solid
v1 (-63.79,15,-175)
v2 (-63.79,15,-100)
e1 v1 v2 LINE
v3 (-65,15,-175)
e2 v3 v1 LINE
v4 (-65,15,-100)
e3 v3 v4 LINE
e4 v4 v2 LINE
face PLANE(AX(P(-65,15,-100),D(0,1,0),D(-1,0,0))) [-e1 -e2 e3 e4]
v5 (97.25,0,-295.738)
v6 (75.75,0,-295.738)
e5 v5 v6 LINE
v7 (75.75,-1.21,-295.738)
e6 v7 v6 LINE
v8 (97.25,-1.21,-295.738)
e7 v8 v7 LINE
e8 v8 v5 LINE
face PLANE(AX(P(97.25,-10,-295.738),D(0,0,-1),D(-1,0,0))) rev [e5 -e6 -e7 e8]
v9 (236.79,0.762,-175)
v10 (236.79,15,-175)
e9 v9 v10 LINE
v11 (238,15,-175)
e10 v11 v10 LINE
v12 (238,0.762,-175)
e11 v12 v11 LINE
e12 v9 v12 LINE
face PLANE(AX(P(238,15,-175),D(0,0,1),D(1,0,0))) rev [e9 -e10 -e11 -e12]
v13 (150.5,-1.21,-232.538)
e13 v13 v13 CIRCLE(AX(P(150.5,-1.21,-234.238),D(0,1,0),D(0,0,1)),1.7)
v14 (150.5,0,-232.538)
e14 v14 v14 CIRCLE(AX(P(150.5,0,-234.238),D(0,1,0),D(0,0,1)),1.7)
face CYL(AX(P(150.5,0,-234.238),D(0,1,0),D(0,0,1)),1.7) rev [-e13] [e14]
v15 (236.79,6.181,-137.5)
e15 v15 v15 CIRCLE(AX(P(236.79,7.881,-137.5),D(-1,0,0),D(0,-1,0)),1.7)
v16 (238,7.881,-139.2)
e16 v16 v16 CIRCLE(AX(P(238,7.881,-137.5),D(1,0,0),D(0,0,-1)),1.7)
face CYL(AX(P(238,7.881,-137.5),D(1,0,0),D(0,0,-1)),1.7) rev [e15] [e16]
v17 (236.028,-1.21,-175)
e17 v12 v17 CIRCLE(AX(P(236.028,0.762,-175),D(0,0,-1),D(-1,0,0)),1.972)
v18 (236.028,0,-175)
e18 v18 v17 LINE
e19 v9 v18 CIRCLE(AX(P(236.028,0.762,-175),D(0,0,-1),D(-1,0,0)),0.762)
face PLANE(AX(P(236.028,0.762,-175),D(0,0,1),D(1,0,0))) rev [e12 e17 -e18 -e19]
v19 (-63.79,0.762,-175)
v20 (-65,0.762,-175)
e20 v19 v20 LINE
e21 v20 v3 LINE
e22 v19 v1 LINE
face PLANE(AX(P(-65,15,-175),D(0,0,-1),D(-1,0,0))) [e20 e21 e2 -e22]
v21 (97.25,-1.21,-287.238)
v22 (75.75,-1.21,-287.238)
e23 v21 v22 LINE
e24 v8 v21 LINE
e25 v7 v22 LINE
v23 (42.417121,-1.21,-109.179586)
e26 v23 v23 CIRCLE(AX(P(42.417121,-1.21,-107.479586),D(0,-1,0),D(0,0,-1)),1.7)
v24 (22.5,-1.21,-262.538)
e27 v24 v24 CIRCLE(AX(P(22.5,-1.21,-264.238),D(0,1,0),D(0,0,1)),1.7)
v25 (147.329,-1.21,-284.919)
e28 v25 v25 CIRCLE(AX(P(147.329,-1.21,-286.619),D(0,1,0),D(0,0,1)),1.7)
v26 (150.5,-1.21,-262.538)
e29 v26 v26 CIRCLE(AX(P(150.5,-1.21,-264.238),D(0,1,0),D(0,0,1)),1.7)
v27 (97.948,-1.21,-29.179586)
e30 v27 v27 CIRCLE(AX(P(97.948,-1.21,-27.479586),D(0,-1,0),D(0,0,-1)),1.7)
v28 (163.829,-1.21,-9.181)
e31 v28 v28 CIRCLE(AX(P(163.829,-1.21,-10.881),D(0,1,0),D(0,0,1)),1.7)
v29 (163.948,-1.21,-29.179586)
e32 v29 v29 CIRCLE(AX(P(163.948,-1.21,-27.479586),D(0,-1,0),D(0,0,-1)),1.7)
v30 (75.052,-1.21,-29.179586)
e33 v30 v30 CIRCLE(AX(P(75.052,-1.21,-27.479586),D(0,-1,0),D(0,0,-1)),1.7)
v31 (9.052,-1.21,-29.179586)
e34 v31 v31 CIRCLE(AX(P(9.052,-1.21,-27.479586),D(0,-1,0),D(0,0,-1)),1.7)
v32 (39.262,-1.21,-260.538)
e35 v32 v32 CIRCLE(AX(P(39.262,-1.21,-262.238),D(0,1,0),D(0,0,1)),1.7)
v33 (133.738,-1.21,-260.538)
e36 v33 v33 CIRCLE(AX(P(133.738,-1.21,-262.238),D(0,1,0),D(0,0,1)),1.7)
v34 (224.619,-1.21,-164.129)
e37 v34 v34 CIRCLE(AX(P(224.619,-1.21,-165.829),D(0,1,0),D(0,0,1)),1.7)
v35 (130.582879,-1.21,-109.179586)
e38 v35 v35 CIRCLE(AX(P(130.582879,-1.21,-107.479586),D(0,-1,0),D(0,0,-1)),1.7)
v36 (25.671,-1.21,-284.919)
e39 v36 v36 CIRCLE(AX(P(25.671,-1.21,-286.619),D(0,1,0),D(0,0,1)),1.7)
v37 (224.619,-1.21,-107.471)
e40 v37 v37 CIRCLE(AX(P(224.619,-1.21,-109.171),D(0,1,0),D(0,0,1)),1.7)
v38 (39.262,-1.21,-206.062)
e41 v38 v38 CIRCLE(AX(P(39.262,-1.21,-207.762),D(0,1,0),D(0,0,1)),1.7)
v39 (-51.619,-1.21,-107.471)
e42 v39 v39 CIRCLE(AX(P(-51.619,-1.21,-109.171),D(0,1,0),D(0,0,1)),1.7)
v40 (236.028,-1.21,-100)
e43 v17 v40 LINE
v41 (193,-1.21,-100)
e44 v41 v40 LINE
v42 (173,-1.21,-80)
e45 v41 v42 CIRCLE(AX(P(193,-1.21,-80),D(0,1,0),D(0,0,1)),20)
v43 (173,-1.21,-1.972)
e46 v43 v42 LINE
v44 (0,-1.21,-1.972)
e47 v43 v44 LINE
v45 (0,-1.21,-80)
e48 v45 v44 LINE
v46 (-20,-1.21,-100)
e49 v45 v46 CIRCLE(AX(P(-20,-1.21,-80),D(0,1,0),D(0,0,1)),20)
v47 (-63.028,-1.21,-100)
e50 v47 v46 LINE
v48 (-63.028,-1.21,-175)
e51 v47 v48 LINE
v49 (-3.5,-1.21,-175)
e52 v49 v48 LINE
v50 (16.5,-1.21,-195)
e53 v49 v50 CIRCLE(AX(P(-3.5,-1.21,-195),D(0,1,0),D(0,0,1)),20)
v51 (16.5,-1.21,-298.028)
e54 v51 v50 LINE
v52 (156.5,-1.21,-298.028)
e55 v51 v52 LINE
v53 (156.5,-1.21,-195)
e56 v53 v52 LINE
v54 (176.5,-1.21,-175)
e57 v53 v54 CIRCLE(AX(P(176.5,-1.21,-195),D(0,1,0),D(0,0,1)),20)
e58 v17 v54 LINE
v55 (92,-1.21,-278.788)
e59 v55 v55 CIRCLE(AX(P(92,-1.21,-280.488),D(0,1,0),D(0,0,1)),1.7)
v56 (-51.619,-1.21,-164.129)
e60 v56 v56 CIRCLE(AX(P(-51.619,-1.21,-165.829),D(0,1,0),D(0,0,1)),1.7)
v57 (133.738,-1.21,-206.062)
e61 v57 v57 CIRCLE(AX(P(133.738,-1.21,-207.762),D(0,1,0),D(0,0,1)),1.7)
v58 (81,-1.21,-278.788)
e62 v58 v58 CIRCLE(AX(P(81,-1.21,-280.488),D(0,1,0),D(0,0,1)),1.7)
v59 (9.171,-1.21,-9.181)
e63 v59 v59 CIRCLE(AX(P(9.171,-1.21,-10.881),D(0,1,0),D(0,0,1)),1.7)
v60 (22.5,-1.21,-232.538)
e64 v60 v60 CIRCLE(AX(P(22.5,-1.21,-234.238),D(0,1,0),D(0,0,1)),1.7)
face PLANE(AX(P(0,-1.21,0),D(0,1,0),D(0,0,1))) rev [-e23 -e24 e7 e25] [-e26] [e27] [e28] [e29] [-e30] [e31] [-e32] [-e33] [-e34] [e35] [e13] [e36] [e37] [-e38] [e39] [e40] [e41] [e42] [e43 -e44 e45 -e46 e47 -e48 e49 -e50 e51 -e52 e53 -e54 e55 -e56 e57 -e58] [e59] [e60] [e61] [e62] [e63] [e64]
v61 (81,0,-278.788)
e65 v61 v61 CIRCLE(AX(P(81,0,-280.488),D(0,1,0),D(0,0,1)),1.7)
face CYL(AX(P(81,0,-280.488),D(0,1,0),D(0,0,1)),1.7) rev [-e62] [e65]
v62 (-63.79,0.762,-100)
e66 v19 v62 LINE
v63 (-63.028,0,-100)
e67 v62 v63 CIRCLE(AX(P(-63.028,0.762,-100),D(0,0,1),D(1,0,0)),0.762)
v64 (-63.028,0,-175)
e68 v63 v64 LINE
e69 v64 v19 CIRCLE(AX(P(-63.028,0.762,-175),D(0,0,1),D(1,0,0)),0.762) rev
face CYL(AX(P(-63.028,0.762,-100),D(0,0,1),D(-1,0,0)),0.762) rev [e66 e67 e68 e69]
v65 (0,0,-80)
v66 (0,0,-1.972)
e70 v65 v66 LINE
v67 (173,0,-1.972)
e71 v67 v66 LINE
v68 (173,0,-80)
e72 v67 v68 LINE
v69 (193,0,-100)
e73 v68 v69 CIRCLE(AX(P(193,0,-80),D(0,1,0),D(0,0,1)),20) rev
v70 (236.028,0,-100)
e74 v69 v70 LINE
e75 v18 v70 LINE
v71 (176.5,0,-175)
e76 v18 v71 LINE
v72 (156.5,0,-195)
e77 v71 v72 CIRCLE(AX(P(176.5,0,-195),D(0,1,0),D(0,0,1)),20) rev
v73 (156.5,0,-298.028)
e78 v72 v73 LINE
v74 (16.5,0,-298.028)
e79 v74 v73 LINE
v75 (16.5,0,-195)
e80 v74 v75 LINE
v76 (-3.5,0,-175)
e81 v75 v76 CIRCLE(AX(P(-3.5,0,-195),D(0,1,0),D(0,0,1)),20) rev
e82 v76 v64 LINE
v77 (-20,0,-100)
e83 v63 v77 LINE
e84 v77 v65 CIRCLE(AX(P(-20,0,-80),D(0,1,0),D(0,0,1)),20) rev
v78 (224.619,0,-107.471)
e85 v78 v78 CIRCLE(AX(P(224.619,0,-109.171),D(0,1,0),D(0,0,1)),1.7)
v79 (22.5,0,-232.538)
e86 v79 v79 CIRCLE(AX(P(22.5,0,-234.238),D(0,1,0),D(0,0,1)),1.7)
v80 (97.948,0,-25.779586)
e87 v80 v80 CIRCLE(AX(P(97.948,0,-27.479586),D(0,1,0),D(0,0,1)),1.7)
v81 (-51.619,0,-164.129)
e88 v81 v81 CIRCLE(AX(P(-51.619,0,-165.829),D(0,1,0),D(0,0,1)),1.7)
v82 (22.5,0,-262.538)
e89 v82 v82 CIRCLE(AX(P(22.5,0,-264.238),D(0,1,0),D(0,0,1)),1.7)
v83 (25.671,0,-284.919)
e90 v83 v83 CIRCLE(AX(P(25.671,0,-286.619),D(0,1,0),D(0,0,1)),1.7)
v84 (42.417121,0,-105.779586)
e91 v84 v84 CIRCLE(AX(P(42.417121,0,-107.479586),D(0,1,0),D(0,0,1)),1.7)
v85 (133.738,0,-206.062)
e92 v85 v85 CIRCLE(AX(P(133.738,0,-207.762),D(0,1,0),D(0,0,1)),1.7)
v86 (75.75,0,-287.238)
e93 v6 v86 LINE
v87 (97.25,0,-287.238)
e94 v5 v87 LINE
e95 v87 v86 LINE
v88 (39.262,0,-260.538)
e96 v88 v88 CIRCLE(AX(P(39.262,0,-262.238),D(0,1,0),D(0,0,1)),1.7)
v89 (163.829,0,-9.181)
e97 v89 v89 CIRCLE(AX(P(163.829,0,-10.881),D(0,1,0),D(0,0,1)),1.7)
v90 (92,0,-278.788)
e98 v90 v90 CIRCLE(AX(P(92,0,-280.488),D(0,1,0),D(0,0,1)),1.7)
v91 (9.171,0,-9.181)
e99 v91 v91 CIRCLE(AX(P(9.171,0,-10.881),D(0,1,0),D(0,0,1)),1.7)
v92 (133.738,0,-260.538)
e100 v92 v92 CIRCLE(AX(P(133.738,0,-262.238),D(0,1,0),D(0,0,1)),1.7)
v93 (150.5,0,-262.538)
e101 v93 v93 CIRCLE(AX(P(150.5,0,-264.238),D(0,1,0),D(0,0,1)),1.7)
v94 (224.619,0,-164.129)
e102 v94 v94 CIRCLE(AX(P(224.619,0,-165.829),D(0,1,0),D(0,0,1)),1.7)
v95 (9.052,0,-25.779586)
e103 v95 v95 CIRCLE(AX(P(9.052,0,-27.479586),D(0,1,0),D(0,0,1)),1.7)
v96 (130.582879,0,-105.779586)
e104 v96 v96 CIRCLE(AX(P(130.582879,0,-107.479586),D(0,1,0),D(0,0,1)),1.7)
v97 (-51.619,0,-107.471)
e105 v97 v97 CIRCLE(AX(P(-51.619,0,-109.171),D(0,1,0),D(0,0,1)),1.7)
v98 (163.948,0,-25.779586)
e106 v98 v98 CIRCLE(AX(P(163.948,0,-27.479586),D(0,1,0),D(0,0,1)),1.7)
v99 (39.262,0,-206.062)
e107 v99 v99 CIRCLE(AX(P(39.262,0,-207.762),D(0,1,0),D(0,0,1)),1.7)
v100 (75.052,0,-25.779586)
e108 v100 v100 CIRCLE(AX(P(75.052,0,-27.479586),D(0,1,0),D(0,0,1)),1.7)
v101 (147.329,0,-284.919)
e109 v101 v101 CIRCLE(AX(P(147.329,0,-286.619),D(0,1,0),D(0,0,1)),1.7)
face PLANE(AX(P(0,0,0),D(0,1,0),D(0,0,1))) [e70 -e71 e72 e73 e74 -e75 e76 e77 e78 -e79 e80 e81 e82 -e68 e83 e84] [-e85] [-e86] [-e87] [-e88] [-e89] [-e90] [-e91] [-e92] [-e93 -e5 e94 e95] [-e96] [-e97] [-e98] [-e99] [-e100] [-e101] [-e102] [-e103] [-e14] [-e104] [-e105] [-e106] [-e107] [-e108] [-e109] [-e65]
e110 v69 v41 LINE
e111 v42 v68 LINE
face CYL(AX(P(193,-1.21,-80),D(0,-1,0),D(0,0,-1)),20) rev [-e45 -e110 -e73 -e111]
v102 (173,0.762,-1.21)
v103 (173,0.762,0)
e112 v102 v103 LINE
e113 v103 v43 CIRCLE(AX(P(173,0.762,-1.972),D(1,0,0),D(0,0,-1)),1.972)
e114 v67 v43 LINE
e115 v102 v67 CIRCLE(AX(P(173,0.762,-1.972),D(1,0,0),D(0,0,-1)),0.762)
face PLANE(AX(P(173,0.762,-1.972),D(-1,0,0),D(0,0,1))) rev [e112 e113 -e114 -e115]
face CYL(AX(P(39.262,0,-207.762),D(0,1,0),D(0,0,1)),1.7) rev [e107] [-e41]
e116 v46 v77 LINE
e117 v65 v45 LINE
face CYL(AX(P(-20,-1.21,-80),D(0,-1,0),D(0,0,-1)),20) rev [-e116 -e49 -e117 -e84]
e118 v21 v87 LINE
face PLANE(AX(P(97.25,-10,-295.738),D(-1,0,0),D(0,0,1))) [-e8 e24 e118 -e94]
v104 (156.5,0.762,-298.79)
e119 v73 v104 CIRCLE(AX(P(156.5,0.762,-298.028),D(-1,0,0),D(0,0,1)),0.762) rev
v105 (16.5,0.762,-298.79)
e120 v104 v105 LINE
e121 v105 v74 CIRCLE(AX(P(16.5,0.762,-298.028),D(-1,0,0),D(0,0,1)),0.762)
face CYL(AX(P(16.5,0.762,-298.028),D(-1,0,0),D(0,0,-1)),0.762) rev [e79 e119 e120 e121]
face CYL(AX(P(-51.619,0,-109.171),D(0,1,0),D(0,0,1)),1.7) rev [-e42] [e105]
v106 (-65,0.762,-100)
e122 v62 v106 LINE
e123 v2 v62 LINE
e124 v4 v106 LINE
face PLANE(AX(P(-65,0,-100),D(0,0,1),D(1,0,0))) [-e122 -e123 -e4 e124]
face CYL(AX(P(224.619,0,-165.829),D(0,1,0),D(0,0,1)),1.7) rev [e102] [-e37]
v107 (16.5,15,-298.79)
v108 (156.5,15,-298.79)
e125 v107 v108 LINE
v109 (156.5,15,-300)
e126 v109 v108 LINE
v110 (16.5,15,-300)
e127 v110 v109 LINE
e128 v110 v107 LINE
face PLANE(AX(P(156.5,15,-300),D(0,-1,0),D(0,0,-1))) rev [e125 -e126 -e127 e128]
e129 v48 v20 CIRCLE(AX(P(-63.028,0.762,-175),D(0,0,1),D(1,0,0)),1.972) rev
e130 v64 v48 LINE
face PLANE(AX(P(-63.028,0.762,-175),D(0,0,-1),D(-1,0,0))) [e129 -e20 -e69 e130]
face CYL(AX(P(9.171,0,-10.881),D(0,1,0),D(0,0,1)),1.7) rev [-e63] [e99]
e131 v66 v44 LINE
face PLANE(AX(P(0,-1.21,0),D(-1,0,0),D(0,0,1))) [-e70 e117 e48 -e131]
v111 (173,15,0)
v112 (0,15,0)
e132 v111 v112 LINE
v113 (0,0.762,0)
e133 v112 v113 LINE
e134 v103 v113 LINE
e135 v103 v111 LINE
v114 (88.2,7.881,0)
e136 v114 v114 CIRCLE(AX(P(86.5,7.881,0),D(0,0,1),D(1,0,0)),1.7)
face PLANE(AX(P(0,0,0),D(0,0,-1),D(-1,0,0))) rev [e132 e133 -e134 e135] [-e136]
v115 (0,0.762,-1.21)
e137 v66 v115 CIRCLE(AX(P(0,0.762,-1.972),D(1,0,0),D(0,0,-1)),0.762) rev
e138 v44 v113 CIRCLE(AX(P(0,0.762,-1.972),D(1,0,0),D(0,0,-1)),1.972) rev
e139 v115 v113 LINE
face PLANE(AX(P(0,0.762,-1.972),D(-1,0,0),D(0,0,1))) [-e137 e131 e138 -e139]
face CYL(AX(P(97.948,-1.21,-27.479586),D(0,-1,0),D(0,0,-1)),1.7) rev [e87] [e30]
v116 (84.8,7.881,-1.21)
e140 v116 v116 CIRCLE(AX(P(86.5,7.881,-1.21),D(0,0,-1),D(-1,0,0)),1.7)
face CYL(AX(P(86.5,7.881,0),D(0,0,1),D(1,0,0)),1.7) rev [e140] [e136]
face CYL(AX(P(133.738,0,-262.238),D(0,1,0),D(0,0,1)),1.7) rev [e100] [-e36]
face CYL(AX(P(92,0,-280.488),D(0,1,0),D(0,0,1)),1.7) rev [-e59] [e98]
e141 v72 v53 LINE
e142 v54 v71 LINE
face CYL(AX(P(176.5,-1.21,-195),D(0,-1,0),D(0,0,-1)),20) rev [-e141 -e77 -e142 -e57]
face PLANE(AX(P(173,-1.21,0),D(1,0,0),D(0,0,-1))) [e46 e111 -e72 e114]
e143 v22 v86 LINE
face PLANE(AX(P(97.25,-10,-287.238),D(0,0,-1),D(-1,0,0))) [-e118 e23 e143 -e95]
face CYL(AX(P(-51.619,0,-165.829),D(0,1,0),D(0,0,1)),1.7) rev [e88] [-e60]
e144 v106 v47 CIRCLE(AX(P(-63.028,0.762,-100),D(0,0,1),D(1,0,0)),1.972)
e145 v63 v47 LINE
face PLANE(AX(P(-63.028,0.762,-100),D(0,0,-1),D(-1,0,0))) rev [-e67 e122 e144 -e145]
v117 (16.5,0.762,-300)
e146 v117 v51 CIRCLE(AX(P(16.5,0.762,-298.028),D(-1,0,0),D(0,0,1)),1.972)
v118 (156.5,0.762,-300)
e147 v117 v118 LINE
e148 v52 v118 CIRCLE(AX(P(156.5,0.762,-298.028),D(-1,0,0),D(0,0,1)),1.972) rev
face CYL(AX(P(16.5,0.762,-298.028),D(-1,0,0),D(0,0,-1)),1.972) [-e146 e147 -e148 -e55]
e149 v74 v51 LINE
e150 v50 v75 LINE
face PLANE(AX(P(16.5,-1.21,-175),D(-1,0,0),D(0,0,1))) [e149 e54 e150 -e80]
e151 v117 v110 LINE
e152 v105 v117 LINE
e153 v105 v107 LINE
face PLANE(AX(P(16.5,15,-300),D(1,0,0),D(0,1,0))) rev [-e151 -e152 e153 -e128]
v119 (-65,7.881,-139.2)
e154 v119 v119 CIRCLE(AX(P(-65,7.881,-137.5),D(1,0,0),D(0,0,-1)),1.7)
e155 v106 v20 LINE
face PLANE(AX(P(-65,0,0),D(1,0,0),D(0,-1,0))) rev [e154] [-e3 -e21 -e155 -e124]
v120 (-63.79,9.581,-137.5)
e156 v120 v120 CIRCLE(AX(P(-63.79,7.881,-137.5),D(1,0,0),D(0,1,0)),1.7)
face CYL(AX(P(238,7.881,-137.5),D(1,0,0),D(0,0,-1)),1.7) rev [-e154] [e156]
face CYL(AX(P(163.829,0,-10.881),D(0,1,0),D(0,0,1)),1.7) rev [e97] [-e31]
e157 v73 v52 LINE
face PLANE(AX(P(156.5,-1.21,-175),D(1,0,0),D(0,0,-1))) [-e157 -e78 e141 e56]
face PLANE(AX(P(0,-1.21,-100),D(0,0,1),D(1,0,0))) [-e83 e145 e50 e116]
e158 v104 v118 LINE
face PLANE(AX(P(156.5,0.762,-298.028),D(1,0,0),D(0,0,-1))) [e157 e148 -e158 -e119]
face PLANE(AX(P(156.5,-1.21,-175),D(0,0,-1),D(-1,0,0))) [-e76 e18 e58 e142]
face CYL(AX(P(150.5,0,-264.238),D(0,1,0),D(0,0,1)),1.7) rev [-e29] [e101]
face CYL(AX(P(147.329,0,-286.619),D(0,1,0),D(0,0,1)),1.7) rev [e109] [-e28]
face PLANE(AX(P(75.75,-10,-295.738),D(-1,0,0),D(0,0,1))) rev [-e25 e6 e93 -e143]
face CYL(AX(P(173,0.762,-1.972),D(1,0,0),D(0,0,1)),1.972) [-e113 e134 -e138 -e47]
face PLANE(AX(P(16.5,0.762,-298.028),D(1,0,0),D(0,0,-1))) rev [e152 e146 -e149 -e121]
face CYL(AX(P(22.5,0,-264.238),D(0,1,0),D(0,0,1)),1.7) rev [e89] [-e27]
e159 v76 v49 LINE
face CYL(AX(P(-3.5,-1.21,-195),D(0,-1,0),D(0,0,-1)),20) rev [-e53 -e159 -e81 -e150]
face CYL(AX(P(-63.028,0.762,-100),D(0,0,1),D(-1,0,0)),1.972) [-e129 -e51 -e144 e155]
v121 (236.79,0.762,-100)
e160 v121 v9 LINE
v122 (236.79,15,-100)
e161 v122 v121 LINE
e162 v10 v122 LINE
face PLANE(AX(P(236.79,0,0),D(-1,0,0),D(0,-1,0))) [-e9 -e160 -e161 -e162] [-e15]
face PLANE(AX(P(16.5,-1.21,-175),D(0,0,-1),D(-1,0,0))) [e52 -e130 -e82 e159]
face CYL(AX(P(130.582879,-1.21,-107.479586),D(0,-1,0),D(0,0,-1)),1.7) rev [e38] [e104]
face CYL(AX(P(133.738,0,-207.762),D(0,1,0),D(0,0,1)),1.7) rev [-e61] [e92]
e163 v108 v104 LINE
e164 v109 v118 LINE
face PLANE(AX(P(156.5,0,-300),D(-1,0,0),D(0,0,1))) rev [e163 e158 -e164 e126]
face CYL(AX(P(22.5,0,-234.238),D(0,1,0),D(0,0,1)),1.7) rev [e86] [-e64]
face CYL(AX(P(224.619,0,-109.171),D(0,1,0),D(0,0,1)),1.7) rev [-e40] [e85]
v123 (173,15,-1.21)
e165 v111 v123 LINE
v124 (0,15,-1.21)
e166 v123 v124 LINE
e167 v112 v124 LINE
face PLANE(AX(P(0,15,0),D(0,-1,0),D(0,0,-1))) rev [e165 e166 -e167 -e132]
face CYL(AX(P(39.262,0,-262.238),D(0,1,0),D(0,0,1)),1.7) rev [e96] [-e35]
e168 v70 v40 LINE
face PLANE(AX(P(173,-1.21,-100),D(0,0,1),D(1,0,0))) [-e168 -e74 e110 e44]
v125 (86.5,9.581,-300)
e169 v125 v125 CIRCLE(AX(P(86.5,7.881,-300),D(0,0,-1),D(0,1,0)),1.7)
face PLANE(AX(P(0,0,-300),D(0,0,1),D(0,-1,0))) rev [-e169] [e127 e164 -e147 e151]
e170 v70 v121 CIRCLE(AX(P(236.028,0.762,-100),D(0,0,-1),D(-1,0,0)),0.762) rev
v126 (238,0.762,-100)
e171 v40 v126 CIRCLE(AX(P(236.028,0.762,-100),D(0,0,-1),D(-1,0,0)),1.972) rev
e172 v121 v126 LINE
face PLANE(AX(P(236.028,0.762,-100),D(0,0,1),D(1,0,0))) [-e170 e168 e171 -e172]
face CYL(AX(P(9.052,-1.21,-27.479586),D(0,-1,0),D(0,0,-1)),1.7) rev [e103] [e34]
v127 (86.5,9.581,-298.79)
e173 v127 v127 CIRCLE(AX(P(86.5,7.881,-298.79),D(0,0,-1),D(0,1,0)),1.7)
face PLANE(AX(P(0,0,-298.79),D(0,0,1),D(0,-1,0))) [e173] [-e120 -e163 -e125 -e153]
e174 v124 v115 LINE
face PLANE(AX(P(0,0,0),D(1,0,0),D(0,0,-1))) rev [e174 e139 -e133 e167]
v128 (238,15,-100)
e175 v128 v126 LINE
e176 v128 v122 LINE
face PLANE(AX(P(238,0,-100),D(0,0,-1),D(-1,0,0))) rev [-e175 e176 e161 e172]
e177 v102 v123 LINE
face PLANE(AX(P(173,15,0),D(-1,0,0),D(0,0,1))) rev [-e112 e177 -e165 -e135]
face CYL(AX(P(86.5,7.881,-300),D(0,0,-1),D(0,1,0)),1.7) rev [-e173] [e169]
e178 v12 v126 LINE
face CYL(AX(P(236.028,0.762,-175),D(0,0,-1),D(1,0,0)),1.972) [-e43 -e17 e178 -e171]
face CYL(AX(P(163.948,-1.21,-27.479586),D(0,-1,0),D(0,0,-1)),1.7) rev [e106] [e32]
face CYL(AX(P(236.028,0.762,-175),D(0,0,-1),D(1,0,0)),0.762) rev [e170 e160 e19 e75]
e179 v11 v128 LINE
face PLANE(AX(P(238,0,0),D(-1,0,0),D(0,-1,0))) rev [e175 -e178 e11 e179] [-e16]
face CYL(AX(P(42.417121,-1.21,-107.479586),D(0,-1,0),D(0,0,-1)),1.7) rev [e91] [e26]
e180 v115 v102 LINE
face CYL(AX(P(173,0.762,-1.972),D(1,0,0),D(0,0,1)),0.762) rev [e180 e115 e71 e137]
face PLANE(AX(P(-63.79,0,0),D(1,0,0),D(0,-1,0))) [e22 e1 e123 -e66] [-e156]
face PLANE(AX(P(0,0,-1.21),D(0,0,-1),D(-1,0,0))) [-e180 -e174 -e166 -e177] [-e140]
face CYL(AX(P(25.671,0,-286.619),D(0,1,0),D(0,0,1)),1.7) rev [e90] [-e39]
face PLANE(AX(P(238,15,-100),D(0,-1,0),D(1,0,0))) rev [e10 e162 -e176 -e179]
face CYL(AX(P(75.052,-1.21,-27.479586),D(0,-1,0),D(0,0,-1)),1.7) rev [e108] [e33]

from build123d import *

# Parameters (mm, degrees)
BASE_FLANGE1_DEPTH            = 1.21
M3_CLEARANCE_HOLE2_AT_2_COUNT = 2
M3_CLEARANCE_HOLE2_AT_2_PITCH = 66
M3_CLEARANCE_HOLE2_AT_3_COUNT = 2
M3_CLEARANCE_HOLE2_AT_3_PITCH = 86.678897774
FILLET1_R                     = 20
SKETCH62_W                    = 21.5
SKETCH62_H                    = 8.5
QRD_CLEARANCE_DEPTH           = 10
QRD_HOLES_D                   = 3.4
QRD_HOLES_DEPTH               = 1.27
QRD_HOLES_TIP                 = 1.021463052
M3_STEERING_BOX_D             = 3.4
M3_STEERING_BOX_DEPTH         = 3
M3_STEERING_BOX_TIP           = 1.021463052
EDGE_FLANGE1_STRIP_W          = 6.364
EDGE_FLANGE1_STRIP_H          = 1.21
EDGE_FLANGE1_STRIP_CUT_DEPTH  = 173
EDGE_FLANGE1_DEPTH            = 173
EDGE_FLANGE2_STRIP_W          = 6.364
EDGE_FLANGE2_STRIP_H          = 1.21
EDGE_FLANGE2_STRIP_CUT_DEPTH  = 140
EDGE_FLANGE2_DEPTH            = 140
EDGE_FLANGE3_STRIP_W          = 6.364
EDGE_FLANGE3_STRIP_H          = 1.21
EDGE_FLANGE3_STRIP_CUT_DEPTH  = 75
EDGE_FLANGE3_DEPTH            = 75
M3_CLEARANCE_HOLE3_D          = 3.4
M3_CLEARANCE_HOLE4_D          = 3.4
M3_CLEARANCE_HOLE5_D          = 3.4
M3_CLEARANCE_HOLE5_DEPTH      = 1.21
M3_CLEARANCE_HOLE6_D          = 3.4
M3_CLEARANCE_HOLE7_D          = 3.4
M3_CLEARANCE_HOLE7_DEPTH      = 1.21
M3_CLEARANCE_HOLE7_TIP        = 1.021463052
M3_CLEARANCE_HOLE8_D          = 3.4
M3_CLEARANCE_HOLE9_D          = 3.4
M3_CLEARANCE_HOLE10_D         = 3.4
M3_CLEARANCE_HOLE11_D         = 3.4


# Sheet-metal steps are written as plain solids
with BuildPart() as part:
    # Sketch1 → Base-Flange1 (new body)
    with BuildSketch(Plane(origin=(0, 0, 0), x_dir=(1, 0, 0), z_dir=(0, 1, 0))):
        Polygon((0, 0), (173, 0), (173, 100), (238, 100), (238, 175), (156.5, 175), (156.5, 300), (16.5, 300), (16.5, 175), (-65, 175), (-65, 100), (0, 100), align=None)
    extrude(amount=-BASE_FLANGE1_DEPTH)

    # Sketch28 → M3 Clearance Hole2 (revolve, cut)
    with BuildSketch(Plane(origin=(9.052, -1.21, -27.479586063), x_dir=(0, 0, -1), z_dir=(1, 0, 0))):
        Polygon((0, 0), (0, 2.291463052), (1.7, 1.27), (1.7, 0), align=None)
    m3_clearance_hole2 = revolve(axis=Axis((9.052, -7.56, -27.479586063), (0, 1, 0)), mode=Mode.SUBTRACT)

    # M3 Clearance Hole2 at 2: M3 Clearance Hole2 ×2
    with Locations(*[(i * M3_CLEARANCE_HOLE2_AT_2_PITCH, 0, 0) for i in range(1, M3_CLEARANCE_HOLE2_AT_2_COUNT)]):
        add(m3_clearance_hole2, mode=Mode.SUBTRACT)

    # M3 Clearance Hole2 at 3: M3 Clearance Hole2 ×2
    with Locations(*[Vector(0.38492784467456836, 0, -0.9229466693120418) * (i * M3_CLEARANCE_HOLE2_AT_3_PITCH) for i in range(1, M3_CLEARANCE_HOLE2_AT_3_COUNT)]):
        add(m3_clearance_hole2, mode=Mode.SUBTRACT)

    # Mirror3: M3 Clearance Hole2 across plane
    add(m3_clearance_hole2.mirror(Plane(origin=(86.5, 0, 0), x_dir=(0, 0, 1), z_dir=(1, 0, 0))), mode=Mode.SUBTRACT)

    # Mirror3 copy 1 sketch → Mirror3 copy 1 (revolve, cut)
    with BuildSketch(Plane(origin=(97.948, -1.21, -27.479586063), x_dir=(0, 0, -1), z_dir=(-1, 0, 0))):
        Polygon((0, 0), (0, -2.291463052), (1.7, -1.27), (1.7, 0), align=None)
    revolve(axis=Axis((97.948, -7.56, -27.479586063), (0, -1, 0)), mode=Mode.SUBTRACT)

    # Mirror3 copy 2 sketch → Mirror3 copy 2 (revolve, cut)
    with BuildSketch(Plane(origin=(130.582878701, -1.21, -107.479586063), x_dir=(0, 0, -1), z_dir=(-1, 0, 0))):
        Polygon((0, 0), (0, -2.291463052), (1.7, -1.27), (1.7, 0), align=None)
    revolve(axis=Axis((130.582878701, -7.56, -107.479586063), (0, -1, 0)), mode=Mode.SUBTRACT)

    # Fillet1
    fillet1_edges = [part.edges().sort_by_distance(p)[0] for p in [
        (0, -0.605, -100),
        (16.5, -0.605, -175),
        (156.5, -0.605, -175),
        (173, -0.605, -100),
    ]]
    fillet(fillet1_edges, radius=FILLET1_R)

    # Sketch62 → QRD Clearance (cut)
    with BuildSketch(Plane(origin=(0, 0, 0), x_dir=(1, 0, 0), z_dir=(0, 1, 0))):
        with Locations((86.5, 291.488)):
            Rectangle(SKETCH62_W, SKETCH62_H)
    extrude(amount=-QRD_CLEARANCE_DEPTH, mode=Mode.SUBTRACT)

    # QRD Holes
    with Locations(Plane(origin=(0, 0, 0), x_dir=(1, 0, 0), z_dir=(0, 1, 0))):
        with Locations((92, 280.488), (81, 280.488)):
            Hole(QRD_HOLES_D / 2, depth=QRD_HOLES_DEPTH)
            with Locations((0, 0, -(QRD_HOLES_DEPTH + QRD_HOLES_TIP / 2))):  # 118° drill point
                Cone(0, QRD_HOLES_D / 2, QRD_HOLES_TIP, mode=Mode.SUBTRACT)

    # M3 (Steering Box)
    with Locations(Plane(origin=(0, 0, 0), x_dir=(1, 0, 0), z_dir=(0, 1, 0))):
        with Locations((39.262, 262.238), (39.262, 207.762), (133.738, 207.762), (133.738, 262.238)):
            Hole(M3_STEERING_BOX_D / 2, depth=M3_STEERING_BOX_DEPTH)
            with Locations((0, 0, -(M3_STEERING_BOX_DEPTH + M3_STEERING_BOX_TIP / 2))):  # 118° drill point
                Cone(0, M3_STEERING_BOX_D / 2, M3_STEERING_BOX_TIP, mode=Mode.SUBTRACT)

    # Edge-Flange1 strip (across the edge) → Edge-Flange1 strip cut (cut)
    with BuildSketch(Plane(origin=(0, 0, 0), x_dir=(0, 0, -1), z_dir=(1, 0, 0))):
        with Locations((-1.21, -0.605)):
            Rectangle(EDGE_FLANGE1_STRIP_W, EDGE_FLANGE1_STRIP_H)
    extrude(amount=EDGE_FLANGE1_STRIP_CUT_DEPTH, mode=Mode.SUBTRACT)

    # Edge-Flange1 section (across the edge) → Edge-Flange1 (add)
    with BuildSketch(Plane(origin=(0, 0, 0), x_dir=(0, 0, -1), z_dir=(1, 0, 0))):
        with BuildLine():
            Line((0, 0.762), (0, 15))
            Line((0, 15), (1.21, 15))
            Line((1.21, 15), (1.21, 0.762))
            ThreePointArc((1.21, 0.762), (1.433184633, 0.223184633), (1.972, 0))
            Line((1.972, 0), (1.972, -1.21))
            ThreePointArc((1.972, -1.21), (0.577585428, -0.632414572), (0, 0.762))
        make_face()
    extrude(amount=EDGE_FLANGE1_DEPTH)

    # Edge-Flange2 strip (across the edge) → Edge-Flange2 strip cut (cut)
    with BuildSketch(Plane(origin=(156.5, 0, -300), x_dir=(0, 0, 1), z_dir=(-1, 0, 0))):
        with Locations((-1.21, -0.605)):
            Rectangle(EDGE_FLANGE2_STRIP_W, EDGE_FLANGE2_STRIP_H)
    extrude(amount=EDGE_FLANGE2_STRIP_CUT_DEPTH, mode=Mode.SUBTRACT)

    # Edge-Flange2 section (across the edge) → Edge-Flange2 (add)
    with BuildSketch(Plane(origin=(156.5, 0, -300), x_dir=(0, 0, 1), z_dir=(-1, 0, 0))):
        with BuildLine():
            Line((0, 0.762), (0, 15))
            Line((0, 15), (1.21, 15))
            Line((1.21, 15), (1.21, 0.762))
            ThreePointArc((1.21, 0.762), (1.433184633, 0.223184633), (1.972, 0))
            Line((1.972, 0), (1.972, -1.21))
            ThreePointArc((1.972, -1.21), (0.577585428, -0.632414572), (0, 0.762))
        make_face()
    extrude(amount=EDGE_FLANGE2_DEPTH)

    # Edge-Flange3 strip (across the edge) → Edge-Flange3 strip cut (cut)
    with BuildSketch(Plane(origin=(238, 0, -100), x_dir=(-1, 0, 0), z_dir=(0, 0, -1))):
        with Locations((-1.21, -0.605)):
            Rectangle(EDGE_FLANGE3_STRIP_W, EDGE_FLANGE3_STRIP_H)
    edge_flange3_strip_cut = extrude(amount=EDGE_FLANGE3_STRIP_CUT_DEPTH, mode=Mode.SUBTRACT)

    # Edge-Flange3 section (across the edge) → Edge-Flange3 (add)
    with BuildSketch(Plane(origin=(238, 0, -100), x_dir=(-1, 0, 0), z_dir=(0, 0, -1))):
        with BuildLine():
            Line((0, 0.762), (0, 15))
            Line((0, 15), (1.21, 15))
            Line((1.21, 15), (1.21, 0.762))
            ThreePointArc((1.21, 0.762), (1.433184633, 0.223184633), (1.972, 0))
            Line((1.972, 0), (1.972, -1.21))
            ThreePointArc((1.972, -1.21), (0.577585428, -0.632414572), (0, 0.762))
        make_face()
    edge_flange3 = extrude(amount=EDGE_FLANGE3_DEPTH)

    # Mirror4: Edge-Flange3 strip cut, Edge-Flange3 across plane
    add(edge_flange3_strip_cut.mirror(Plane(origin=(86.5, 0, 0), x_dir=(0, 0, 1), z_dir=(1, 0, 0))), mode=Mode.SUBTRACT)
    add(edge_flange3.mirror(Plane(origin=(86.5, 0, 0), x_dir=(0, 0, 1), z_dir=(1, 0, 0))))

    # M3 Clearance Hole3 (through all)
    with Locations(Plane(origin=(50.766060613, 0, -139.899791502), x_dir=(1, 0, 0), z_dir=(0, 1, 0))):
        with Locations((-28.266060613, 124.338208498), (-28.266060613, 94.338208498)):
            Hole(M3_CLEARANCE_HOLE3_D / 2)

    # M3 Clearance Hole4 (through all)
    with Locations(Plane(origin=(50.766060613, 0, -139.899791502), x_dir=(1, 0, 0), z_dir=(0, 1, 0))):
        with Locations((99.733939387, 124.338208498), (99.733939387, 94.338208498)):
            Hole(M3_CLEARANCE_HOLE4_D / 2)

    # M3 Clearance Hole5
    with Locations(Plane.XY):
        with Locations((86.5, 7.881)):
            Hole(M3_CLEARANCE_HOLE5_D / 2, depth=M3_CLEARANCE_HOLE5_DEPTH)

    # M3 Clearance Hole6 (through all)
    with Locations(Plane(origin=(238, 0, 0), x_dir=(0, 0, -1), z_dir=(1, 0, 0))):
        with Locations((137.5, 7.881)):
            Hole(M3_CLEARANCE_HOLE6_D / 2)

    # M3 Clearance Hole7
    with Locations(Plane(origin=(0, 0, -300), x_dir=(-1, 0, 0), z_dir=(0, 0, -1))):
        with Locations((-86.5, 7.881)):
            Hole(M3_CLEARANCE_HOLE7_D / 2, depth=M3_CLEARANCE_HOLE7_DEPTH)
            with Locations((0, 0, -(M3_CLEARANCE_HOLE7_DEPTH + M3_CLEARANCE_HOLE7_TIP / 2))):  # 118° drill point
                Cone(0, M3_CLEARANCE_HOLE7_D / 2, M3_CLEARANCE_HOLE7_TIP, mode=Mode.SUBTRACT)

    # M3 Clearance Hole8 (through all)
    with Locations(Plane(origin=(50.766060613, 0, -139.899791502), x_dir=(1, 0, 0), z_dir=(0, 1, 0))):
        with Locations((-25.095060613, 146.719208498), (96.562939387, 146.719208498)):
            Hole(M3_CLEARANCE_HOLE8_D / 2)

    # M3 Clearance Hole9 (through all)
    with Locations(Plane(origin=(50.766060613, 0, -139.899791502), x_dir=(1, 0, 0), z_dir=(0, 1, 0))):
        with Locations((-102.385060613, -30.728791502), (-102.385060613, 25.929208498)):
            Hole(M3_CLEARANCE_HOLE9_D / 2)

    # M3 Clearance Hole10 (through all)
    with Locations(Plane(origin=(50.766060613, 0, -139.899791502), x_dir=(1, 0, 0), z_dir=(0, 1, 0))):
        with Locations((173.852939387, 25.929208498), (173.852939387, -30.728791502)):
            Hole(M3_CLEARANCE_HOLE10_D / 2)

    # M3 Clearance Hole11 (through all)
    with Locations(Plane(origin=(50.766060613, 0, -139.899791502), x_dir=(1, 0, 0), z_dir=(0, 1, 0))):
        with Locations((113.062939387, -129.018791502), (-41.595060613, -129.018791502)):
            Hole(M3_CLEARANCE_HOLE11_D / 2)


solid = part.part
